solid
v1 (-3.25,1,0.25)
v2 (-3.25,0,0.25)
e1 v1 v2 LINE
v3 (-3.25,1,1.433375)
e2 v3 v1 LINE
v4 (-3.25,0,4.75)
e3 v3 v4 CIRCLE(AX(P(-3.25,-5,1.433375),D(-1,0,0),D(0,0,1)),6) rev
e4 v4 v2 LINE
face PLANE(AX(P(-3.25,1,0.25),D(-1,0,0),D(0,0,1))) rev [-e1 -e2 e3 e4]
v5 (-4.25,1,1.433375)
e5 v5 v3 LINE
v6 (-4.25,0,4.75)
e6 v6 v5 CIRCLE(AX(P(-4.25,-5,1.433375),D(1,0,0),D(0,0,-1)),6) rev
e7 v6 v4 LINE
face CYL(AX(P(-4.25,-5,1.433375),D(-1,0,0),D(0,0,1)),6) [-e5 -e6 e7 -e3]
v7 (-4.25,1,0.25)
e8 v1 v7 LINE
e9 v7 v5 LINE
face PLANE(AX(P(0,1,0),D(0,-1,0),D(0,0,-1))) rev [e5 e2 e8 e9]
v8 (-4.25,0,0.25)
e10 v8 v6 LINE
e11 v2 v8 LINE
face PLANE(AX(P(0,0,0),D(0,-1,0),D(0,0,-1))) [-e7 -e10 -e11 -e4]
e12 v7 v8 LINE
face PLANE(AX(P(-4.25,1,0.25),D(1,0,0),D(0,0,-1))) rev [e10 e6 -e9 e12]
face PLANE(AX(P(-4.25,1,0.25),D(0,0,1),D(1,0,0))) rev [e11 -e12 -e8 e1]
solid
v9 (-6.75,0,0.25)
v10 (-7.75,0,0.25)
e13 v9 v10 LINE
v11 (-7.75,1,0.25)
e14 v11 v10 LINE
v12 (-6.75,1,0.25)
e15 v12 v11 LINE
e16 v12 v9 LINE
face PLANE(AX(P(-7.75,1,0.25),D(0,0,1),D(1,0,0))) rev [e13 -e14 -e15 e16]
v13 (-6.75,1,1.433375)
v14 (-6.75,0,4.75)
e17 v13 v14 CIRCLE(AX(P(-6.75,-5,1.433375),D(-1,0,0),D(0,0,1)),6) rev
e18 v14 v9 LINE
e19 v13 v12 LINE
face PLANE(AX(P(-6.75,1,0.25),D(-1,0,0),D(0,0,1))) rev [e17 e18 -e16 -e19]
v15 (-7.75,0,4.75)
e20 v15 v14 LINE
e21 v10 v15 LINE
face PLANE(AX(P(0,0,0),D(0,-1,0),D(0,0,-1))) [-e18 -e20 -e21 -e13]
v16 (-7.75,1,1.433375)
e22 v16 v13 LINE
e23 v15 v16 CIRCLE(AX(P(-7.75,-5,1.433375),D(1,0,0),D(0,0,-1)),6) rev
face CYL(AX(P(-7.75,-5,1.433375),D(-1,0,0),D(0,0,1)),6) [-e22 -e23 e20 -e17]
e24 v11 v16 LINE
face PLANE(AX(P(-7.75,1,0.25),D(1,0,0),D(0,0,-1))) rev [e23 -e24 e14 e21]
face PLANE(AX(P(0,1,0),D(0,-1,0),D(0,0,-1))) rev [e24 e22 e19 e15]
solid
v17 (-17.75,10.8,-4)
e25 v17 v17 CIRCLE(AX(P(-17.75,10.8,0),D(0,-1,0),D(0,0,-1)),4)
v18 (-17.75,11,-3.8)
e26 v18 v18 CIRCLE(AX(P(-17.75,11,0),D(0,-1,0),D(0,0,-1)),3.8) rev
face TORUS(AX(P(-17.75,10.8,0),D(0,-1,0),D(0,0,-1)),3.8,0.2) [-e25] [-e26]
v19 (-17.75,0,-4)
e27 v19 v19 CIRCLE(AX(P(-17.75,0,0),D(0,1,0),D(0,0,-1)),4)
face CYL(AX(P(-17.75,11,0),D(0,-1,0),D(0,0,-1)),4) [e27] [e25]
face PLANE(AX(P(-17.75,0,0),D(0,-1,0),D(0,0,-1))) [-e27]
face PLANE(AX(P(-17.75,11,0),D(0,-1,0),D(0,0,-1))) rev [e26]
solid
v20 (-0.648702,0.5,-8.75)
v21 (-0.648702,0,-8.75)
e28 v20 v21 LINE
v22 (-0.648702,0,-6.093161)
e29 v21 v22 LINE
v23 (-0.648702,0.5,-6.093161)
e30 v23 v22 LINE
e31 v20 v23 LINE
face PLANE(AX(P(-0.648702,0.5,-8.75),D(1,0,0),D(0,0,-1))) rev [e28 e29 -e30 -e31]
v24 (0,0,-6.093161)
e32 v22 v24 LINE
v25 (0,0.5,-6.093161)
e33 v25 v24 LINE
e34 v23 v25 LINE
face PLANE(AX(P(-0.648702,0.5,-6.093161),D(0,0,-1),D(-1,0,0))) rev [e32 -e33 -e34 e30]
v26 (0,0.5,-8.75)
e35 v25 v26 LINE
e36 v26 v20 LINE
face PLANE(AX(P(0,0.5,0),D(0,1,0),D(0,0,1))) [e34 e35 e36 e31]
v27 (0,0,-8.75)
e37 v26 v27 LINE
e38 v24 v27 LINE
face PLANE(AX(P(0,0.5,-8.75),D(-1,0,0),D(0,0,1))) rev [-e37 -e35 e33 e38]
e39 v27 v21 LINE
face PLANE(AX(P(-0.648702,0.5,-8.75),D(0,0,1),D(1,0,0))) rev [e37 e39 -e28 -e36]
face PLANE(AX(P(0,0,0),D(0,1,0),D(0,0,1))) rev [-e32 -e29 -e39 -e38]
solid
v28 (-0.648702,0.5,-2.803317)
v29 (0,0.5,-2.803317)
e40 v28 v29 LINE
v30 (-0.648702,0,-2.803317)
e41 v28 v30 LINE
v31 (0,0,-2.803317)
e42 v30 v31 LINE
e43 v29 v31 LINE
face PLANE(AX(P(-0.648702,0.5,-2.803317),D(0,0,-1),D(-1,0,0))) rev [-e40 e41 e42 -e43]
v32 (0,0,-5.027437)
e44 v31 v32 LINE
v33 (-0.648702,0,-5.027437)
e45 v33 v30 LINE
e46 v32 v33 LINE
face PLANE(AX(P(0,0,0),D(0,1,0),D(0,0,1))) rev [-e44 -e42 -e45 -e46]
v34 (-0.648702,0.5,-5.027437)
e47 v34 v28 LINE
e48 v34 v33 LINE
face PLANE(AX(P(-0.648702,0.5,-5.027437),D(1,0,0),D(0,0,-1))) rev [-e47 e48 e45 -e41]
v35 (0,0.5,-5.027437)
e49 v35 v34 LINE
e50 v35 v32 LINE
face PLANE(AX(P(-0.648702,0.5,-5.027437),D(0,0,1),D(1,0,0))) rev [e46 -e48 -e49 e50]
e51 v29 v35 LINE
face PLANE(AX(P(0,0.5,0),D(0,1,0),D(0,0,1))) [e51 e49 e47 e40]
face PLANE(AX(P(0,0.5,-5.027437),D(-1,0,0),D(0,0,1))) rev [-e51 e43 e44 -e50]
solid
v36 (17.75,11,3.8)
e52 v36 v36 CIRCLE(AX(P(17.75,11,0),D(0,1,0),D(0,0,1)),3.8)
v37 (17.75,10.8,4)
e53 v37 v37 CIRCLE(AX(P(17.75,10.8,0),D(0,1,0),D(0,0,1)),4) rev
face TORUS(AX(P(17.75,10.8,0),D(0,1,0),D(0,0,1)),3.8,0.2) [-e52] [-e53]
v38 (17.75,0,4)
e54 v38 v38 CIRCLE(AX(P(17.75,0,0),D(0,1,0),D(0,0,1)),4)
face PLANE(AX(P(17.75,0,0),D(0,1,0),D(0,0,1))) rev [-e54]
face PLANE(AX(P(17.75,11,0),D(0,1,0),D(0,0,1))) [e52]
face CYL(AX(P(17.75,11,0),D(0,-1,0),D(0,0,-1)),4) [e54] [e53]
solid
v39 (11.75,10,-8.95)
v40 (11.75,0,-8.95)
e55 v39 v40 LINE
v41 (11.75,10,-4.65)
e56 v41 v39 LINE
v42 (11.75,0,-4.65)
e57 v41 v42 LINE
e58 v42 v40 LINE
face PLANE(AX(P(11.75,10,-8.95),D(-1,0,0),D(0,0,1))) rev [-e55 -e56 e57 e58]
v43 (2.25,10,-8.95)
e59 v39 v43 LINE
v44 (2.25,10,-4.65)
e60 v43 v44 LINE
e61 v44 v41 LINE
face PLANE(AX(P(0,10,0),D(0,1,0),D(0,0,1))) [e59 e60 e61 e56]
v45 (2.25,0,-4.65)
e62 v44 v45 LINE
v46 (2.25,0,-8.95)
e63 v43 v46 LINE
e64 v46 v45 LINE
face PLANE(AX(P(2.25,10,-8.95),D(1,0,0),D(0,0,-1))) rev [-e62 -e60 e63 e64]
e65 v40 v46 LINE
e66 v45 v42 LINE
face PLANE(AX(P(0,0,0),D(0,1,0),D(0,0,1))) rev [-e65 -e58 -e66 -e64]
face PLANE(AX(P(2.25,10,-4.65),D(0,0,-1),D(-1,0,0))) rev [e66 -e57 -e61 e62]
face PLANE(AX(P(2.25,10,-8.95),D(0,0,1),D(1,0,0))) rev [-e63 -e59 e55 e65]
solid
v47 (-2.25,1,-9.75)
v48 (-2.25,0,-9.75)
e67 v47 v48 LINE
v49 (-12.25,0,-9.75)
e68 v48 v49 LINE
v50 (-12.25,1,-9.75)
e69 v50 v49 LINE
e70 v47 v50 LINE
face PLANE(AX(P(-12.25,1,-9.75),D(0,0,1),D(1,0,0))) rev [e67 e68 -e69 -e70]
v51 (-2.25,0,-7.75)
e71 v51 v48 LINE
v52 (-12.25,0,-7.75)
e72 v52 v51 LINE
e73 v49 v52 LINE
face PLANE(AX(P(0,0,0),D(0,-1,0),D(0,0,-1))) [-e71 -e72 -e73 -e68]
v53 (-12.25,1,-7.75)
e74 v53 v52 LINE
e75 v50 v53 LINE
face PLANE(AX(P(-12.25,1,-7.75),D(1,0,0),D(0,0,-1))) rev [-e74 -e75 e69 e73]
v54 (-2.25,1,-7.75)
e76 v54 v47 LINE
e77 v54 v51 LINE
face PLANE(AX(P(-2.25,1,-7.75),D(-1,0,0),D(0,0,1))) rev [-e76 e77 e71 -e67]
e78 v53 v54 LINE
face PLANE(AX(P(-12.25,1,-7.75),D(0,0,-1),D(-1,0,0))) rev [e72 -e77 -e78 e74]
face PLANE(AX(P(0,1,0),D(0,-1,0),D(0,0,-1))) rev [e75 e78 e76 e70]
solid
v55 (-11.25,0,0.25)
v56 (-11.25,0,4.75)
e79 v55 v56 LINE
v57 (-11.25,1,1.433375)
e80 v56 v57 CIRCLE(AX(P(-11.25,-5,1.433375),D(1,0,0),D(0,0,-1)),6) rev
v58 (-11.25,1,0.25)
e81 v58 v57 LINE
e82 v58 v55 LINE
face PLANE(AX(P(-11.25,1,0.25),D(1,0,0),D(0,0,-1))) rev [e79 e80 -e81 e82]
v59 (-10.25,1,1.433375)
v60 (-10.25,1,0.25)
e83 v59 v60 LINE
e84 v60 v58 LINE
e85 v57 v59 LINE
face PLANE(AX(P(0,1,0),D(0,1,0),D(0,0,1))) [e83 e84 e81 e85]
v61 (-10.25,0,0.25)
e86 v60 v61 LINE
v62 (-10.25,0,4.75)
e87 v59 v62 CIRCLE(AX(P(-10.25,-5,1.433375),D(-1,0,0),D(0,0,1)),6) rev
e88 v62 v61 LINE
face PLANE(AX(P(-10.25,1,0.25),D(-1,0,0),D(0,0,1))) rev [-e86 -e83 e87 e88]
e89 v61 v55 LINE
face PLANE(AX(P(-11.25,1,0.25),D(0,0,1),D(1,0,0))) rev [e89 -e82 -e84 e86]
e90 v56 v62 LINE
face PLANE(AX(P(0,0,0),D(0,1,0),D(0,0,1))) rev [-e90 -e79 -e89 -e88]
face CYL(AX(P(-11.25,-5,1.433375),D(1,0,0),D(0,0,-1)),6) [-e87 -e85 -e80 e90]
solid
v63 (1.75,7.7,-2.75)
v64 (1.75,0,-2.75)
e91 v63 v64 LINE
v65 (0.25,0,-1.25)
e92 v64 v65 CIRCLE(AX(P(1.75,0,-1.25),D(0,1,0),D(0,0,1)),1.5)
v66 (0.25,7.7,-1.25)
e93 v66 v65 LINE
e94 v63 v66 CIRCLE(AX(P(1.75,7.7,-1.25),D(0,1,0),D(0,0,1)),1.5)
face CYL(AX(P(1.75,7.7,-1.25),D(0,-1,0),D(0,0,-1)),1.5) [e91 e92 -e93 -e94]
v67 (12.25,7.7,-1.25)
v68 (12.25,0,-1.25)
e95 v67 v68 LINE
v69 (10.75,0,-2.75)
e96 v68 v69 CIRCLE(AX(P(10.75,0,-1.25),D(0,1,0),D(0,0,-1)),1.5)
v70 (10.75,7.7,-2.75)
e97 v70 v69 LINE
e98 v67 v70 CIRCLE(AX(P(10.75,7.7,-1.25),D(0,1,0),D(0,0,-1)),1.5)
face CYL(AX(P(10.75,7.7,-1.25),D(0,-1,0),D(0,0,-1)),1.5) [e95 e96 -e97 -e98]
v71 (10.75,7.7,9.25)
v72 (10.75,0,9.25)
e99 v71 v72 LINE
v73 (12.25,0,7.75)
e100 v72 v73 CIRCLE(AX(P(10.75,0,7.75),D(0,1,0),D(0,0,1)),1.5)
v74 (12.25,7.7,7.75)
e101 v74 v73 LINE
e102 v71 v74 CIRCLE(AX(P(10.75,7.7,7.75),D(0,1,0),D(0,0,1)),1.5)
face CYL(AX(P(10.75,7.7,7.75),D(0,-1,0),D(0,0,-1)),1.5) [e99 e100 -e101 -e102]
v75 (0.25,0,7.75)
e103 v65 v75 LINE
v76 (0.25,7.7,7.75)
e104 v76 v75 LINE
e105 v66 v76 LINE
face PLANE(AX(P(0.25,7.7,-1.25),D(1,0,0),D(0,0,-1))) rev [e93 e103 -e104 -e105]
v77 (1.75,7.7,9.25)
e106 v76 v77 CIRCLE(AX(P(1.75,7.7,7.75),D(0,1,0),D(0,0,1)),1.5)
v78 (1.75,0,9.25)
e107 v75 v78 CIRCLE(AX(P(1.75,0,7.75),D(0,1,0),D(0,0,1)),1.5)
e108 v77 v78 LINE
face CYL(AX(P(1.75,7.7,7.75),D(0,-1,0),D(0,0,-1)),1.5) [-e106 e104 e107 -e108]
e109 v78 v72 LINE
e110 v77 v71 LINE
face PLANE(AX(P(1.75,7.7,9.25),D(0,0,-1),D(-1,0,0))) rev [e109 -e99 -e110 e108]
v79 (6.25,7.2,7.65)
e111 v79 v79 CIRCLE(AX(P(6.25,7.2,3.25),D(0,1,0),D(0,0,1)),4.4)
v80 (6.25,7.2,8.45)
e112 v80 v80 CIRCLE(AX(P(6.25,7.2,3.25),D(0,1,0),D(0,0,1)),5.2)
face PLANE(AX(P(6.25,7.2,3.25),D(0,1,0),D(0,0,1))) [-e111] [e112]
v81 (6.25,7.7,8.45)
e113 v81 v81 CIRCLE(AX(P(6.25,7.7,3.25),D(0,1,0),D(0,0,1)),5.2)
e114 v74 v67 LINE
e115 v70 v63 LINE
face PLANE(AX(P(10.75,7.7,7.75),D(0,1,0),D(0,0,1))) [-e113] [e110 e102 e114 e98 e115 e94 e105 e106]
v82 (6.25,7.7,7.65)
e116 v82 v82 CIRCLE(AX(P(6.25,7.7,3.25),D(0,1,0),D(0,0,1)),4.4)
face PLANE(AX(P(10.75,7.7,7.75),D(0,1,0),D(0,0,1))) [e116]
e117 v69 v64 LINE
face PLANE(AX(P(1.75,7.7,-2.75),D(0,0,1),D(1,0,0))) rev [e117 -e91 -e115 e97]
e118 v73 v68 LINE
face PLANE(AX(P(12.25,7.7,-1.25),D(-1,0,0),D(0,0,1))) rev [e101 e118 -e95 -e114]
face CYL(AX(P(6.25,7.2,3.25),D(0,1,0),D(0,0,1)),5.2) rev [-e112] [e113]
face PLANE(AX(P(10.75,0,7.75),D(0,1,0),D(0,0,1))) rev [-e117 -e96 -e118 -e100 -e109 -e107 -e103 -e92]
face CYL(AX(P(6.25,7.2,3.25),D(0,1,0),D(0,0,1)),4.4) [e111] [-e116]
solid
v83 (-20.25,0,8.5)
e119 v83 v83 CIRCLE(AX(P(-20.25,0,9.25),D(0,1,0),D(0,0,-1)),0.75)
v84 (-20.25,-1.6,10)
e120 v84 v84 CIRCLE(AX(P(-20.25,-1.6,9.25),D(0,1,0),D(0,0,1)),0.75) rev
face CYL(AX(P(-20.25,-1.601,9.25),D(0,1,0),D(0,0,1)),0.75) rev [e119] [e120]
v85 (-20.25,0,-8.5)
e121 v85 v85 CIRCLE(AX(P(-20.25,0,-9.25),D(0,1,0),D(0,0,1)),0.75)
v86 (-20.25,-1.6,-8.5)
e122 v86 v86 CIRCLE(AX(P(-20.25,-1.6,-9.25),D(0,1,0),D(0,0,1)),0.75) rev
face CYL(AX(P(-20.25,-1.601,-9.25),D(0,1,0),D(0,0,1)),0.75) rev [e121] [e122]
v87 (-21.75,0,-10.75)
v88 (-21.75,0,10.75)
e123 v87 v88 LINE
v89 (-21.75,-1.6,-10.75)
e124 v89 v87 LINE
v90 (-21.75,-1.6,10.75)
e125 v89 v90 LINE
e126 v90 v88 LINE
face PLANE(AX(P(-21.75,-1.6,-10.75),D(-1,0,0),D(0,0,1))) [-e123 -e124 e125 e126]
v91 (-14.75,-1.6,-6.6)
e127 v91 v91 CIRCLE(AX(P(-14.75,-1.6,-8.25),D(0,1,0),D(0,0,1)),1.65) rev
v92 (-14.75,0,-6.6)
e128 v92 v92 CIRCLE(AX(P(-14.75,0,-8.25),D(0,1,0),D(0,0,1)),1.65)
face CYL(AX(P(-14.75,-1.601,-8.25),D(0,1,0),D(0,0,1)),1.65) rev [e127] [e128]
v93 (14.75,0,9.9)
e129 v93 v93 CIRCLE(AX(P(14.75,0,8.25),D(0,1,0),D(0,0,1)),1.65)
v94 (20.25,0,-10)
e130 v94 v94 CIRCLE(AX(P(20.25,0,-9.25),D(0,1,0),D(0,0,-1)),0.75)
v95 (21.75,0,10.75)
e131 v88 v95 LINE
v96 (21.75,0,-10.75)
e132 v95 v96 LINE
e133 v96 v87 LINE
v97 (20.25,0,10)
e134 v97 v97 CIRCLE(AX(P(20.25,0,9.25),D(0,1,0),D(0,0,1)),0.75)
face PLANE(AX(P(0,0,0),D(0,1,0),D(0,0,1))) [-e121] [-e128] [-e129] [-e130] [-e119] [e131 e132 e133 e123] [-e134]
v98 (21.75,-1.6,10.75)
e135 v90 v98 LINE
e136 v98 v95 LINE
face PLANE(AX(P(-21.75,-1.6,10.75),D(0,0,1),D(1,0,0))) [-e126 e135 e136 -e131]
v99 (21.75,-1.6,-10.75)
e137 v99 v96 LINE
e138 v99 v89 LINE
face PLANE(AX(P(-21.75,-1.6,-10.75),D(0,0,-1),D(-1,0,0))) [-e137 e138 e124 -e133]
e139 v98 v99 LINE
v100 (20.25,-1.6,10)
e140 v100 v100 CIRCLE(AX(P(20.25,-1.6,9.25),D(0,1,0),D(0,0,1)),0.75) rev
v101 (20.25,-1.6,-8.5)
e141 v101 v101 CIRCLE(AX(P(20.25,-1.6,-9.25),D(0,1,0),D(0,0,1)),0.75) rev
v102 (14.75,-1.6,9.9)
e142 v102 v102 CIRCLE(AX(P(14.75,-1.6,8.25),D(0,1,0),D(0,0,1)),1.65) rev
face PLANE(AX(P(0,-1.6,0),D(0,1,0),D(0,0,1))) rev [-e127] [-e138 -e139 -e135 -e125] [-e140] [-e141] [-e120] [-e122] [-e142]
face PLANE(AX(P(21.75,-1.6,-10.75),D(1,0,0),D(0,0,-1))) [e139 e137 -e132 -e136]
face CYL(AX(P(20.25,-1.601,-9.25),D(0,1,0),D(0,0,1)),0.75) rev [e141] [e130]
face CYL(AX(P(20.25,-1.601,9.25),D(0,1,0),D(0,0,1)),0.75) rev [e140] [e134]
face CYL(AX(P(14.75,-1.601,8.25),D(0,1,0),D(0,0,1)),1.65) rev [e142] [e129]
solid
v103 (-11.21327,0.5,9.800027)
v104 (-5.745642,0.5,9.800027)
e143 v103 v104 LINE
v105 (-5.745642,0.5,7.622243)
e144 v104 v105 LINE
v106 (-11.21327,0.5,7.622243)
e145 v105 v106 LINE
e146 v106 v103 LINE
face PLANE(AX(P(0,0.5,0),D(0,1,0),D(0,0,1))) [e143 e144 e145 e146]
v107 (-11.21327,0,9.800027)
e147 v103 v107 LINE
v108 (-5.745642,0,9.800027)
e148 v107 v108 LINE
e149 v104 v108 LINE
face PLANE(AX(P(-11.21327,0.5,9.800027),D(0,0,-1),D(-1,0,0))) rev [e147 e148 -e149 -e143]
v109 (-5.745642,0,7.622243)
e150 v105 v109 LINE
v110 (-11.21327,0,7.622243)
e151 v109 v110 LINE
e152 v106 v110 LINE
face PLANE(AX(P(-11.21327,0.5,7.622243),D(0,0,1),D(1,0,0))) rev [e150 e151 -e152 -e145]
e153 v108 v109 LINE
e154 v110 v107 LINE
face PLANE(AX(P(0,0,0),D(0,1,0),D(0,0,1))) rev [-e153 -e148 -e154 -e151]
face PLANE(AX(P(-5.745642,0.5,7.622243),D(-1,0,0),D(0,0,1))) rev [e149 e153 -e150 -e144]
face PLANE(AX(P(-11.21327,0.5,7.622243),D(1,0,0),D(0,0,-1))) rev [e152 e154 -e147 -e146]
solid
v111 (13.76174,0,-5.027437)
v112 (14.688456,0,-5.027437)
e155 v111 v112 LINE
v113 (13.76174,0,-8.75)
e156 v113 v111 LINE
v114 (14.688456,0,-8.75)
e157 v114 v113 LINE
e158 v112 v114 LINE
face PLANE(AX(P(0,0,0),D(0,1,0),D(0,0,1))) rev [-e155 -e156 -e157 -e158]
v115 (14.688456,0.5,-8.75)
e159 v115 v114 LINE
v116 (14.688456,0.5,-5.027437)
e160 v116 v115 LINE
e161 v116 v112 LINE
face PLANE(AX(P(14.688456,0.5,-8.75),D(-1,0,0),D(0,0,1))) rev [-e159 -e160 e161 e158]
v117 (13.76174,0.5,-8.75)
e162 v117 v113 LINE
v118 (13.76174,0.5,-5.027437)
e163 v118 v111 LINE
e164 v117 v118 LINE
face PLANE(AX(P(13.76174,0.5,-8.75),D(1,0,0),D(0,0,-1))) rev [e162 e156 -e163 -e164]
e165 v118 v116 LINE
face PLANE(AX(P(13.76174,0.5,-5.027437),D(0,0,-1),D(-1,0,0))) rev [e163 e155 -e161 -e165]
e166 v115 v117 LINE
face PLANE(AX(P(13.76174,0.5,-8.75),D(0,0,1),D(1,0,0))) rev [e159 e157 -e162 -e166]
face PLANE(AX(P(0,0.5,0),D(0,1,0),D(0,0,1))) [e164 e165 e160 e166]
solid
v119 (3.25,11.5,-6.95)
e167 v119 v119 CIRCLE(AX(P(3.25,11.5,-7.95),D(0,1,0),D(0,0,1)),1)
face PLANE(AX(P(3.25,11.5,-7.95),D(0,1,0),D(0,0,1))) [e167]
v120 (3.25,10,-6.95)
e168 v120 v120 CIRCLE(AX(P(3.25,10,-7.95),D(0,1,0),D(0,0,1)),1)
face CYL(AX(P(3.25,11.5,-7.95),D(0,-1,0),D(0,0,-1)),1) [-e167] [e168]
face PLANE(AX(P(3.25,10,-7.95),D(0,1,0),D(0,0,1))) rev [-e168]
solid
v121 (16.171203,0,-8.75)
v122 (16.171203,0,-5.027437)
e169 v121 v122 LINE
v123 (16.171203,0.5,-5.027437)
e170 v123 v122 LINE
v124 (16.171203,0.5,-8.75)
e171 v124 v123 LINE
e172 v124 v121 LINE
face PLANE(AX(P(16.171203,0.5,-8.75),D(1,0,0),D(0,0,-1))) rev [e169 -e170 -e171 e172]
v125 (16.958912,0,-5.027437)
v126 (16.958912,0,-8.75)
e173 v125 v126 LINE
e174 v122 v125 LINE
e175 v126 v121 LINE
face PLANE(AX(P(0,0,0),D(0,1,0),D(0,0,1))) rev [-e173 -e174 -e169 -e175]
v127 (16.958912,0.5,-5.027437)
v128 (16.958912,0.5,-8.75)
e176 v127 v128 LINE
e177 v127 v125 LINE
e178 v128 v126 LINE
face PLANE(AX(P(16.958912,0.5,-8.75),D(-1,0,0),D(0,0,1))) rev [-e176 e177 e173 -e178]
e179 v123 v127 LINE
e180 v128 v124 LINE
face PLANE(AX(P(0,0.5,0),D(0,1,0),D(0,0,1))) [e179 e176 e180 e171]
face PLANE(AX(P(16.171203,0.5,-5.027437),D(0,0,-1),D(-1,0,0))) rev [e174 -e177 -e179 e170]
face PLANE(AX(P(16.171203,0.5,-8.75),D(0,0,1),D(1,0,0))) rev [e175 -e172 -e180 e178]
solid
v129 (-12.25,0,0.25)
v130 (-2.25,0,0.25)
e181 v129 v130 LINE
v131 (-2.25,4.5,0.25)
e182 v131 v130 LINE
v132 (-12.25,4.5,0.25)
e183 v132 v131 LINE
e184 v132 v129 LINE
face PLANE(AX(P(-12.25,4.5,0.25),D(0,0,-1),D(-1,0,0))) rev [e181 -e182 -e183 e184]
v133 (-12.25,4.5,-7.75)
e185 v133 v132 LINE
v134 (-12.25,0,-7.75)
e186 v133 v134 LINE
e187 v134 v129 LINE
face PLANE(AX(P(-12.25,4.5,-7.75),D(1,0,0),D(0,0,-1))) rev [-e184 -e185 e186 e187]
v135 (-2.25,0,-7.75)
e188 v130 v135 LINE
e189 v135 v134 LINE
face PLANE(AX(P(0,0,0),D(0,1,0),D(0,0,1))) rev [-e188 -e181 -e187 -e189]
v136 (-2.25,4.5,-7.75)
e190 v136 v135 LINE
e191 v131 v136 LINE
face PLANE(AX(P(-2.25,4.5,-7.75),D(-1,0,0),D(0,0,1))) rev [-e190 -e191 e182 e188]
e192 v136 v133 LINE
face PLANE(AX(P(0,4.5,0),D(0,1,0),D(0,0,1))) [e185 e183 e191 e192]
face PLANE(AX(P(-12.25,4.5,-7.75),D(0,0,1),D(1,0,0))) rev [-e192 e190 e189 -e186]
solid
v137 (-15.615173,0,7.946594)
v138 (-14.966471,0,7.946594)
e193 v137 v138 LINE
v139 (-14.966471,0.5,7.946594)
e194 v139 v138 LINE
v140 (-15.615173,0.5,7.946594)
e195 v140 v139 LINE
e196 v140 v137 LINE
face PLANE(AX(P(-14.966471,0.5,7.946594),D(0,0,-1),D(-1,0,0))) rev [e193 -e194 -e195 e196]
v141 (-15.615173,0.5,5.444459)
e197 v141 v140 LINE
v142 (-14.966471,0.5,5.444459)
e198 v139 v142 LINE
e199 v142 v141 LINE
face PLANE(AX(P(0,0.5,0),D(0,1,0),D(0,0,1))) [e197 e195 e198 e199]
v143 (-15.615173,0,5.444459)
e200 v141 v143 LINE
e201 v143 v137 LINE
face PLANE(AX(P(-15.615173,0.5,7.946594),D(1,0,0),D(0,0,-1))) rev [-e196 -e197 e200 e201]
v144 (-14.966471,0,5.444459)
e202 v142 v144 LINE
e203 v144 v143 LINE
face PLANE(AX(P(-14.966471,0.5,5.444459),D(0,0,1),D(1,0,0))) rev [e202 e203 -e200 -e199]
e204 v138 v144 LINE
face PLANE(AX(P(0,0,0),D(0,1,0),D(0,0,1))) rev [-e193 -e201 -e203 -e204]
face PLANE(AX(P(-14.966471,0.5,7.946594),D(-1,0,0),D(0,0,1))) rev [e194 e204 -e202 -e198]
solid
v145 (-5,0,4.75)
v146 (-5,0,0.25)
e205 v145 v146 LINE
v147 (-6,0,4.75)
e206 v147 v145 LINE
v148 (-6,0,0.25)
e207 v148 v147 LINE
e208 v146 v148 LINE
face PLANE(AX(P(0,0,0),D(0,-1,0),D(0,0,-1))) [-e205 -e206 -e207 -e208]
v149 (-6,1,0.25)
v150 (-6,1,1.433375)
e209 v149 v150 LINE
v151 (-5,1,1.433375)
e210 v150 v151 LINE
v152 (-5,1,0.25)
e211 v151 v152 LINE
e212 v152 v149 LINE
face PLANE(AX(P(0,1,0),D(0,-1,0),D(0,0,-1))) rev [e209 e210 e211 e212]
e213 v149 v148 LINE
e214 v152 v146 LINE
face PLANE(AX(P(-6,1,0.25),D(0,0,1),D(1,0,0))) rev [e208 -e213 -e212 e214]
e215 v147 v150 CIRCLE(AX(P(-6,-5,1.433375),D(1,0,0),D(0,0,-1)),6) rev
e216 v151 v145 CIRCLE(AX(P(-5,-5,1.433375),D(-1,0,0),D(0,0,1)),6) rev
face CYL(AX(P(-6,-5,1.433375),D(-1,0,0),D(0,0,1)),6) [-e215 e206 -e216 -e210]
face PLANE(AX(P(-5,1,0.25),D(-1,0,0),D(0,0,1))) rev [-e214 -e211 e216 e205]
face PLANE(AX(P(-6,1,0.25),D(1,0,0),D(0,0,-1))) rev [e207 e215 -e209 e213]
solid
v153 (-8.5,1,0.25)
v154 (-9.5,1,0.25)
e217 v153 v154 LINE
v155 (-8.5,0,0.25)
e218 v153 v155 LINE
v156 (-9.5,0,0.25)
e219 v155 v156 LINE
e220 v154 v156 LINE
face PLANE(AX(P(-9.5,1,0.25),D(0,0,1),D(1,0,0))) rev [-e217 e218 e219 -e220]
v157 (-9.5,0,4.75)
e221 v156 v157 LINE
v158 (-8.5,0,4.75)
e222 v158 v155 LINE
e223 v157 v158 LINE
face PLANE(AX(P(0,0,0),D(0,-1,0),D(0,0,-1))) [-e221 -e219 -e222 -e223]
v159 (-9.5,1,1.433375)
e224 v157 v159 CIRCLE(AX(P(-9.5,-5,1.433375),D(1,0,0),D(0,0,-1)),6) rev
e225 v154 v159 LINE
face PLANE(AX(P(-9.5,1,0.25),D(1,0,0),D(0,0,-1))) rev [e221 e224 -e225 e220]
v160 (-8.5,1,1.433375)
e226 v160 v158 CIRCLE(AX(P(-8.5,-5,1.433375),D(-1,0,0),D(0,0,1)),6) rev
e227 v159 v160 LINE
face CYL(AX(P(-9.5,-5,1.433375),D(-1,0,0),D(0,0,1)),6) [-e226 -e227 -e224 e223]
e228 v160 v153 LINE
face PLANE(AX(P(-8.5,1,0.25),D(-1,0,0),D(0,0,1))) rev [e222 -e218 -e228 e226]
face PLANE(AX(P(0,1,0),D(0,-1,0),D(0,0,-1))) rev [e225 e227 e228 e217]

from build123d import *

# Parameters (mm, degrees)
CROQUIS1_W                = 43.5
CROQUIS1_H                = 21.5
SALIENTE_EXTRUIR1_DEPTH   = 1.6
CORTAR_EXTRUIR1_REACH     = 26.314
CROQUIS2_R                = 1.65
CROQUIS2_R_2              = 0.75
CROQUIS3_R                = 4
SALIENTE_EXTRUIR2_DEPTH   = 11
SALIENTE_EXTRUIR2_2_DEPTH = 11
REDONDEO1_R               = 0.2
REDONDEO2_R               = 0.2
SALIENTE_EXTRUIR3_DEPTH   = 7.7
CROQUIS5_R                = 5.2
CROQUIS5_R_2              = 4.4
CORTAR_EXTRUIR2_DEPTH     = 0.5
CROQUIS6_W                = 9.5
CROQUIS6_H                = 4.3
SALIENTE_EXTRUIR4_DEPTH   = 10
CROQUIS7_R                = 1
SALIENTE_EXTRUIR5_DEPTH   = 1.5
CROQUIS8_W                = 10
CROQUIS8_H                = 8
SALIENTE_EXTRUIR6_DEPTH   = 4.5
CROQUIS9_W                = 1
CROQUIS9_H                = 4.5
SALIENTE_EXTRUIR7_DEPTH   = 1
SALIENTE_EXTRUIR7_2_DEPTH = 1
SALIENTE_EXTRUIR7_3_DEPTH = 1
SALIENTE_EXTRUIR7_4_DEPTH = 1
SALIENTE_EXTRUIR7_5_DEPTH = 1
REDONDEO4_R               = 6
REDONDEO5_R               = 6
REDONDEO6_R               = 6
REDONDEO7_R               = 6
REDONDEO8_R               = 6
CROQUIS10_W               = 10
CROQUIS10_H               = 2
SALIENTE_EXTRUIR8_DEPTH   = 1
CROQUIS11_W               = 5.467627337
CROQUIS11_H               = 2.17778377
SALIENTE_EXTRUIR9_DEPTH   = 0.5
CROQUIS11_W_2             = 0.648701548
CROQUIS11_H_2             = 2.502134543
SALIENTE_EXTRUIR9_2_DEPTH = 0.5
CROQUIS11_H_3             = 2.656839028
SALIENTE_EXTRUIR9_3_DEPTH = 0.5
CROQUIS11_H_4             = 2.224119595
SALIENTE_EXTRUIR9_4_DEPTH = 0.5
CROQUIS11_W_3             = 0.926716498
CROQUIS11_H_5             = 3.722563
SALIENTE_EXTRUIR9_5_DEPTH = 0.5
CROQUIS11_W_4             = 0.787709023
SALIENTE_EXTRUIR9_6_DEPTH = 0.5


with BuildPart() as part:
    # Croquis1 → Saliente-Extruir1 (new body)
    with BuildSketch(Plane(origin=(0, 0, 0), x_dir=(1, 0, 0), z_dir=(0, 1, 0))):
        Rectangle(CROQUIS1_W, CROQUIS1_H)
    extrude(amount=-SALIENTE_EXTRUIR1_DEPTH)

    # Croquis2 → Cortar-Extruir1 (cut, up to next)
    with BuildSketch(Plane(origin=(0, 0, 0), x_dir=(1, 0, 0), z_dir=(0, 1, 0)), mode=Mode.PRIVATE) as cortar_extruir1_sk1:
        with Locations(Location((14.75, -8.25, 0), (0, 0, 270))):
            Circle(CROQUIS2_R)
    cortar_extruir1_tool1 = extrude(cortar_extruir1_sk1.sketch, amount=-CORTAR_EXTRUIR1_REACH, mode=Mode.PRIVATE) & part.part
    # Croquis2 → Cortar-Extruir1 (cut, up to next)
    with BuildSketch(Plane(origin=(0, 0, 0), x_dir=(1, 0, 0), z_dir=(0, 1, 0)), mode=Mode.PRIVATE) as cortar_extruir1_sk2:
        with Locations(Location((-14.75, 8.25, 0), (0, 0, 270))):
            Circle(CROQUIS2_R)
    cortar_extruir1_tool2 = extrude(cortar_extruir1_sk2.sketch, amount=-CORTAR_EXTRUIR1_REACH, mode=Mode.PRIVATE) & part.part
    # Croquis2 → Cortar-Extruir1 (cut, up to next)
    with BuildSketch(Plane(origin=(0, 0, 0), x_dir=(1, 0, 0), z_dir=(0, 1, 0)), mode=Mode.PRIVATE) as cortar_extruir1_sk3:
        with Locations(Location((20.25, -9.25, 0), (0, 0, 270))):
            Circle(CROQUIS2_R_2)
    cortar_extruir1_tool3 = extrude(cortar_extruir1_sk3.sketch, amount=-CORTAR_EXTRUIR1_REACH, mode=Mode.PRIVATE) & part.part
    # Croquis2 → Cortar-Extruir1 (cut, up to next)
    with BuildSketch(Plane(origin=(0, 0, 0), x_dir=(1, 0, 0), z_dir=(0, 1, 0)), mode=Mode.PRIVATE) as cortar_extruir1_sk4:
        with Locations(Location((-20.25, -9.25, 0), (0, 0, 270))):
            Circle(CROQUIS2_R_2)
    cortar_extruir1_tool4 = extrude(cortar_extruir1_sk4.sketch, amount=-CORTAR_EXTRUIR1_REACH, mode=Mode.PRIVATE) & part.part
    # Croquis2 → Cortar-Extruir1 (cut, up to next)
    with BuildSketch(Plane(origin=(0, 0, 0), x_dir=(1, 0, 0), z_dir=(0, 1, 0)), mode=Mode.PRIVATE) as cortar_extruir1_sk5:
        with Locations(Location((20.25, 9.25, 0), (0, 0, 270))):
            Circle(CROQUIS2_R_2)
    cortar_extruir1_tool5 = extrude(cortar_extruir1_sk5.sketch, amount=-CORTAR_EXTRUIR1_REACH, mode=Mode.PRIVATE) & part.part
    # Croquis2 → Cortar-Extruir1 (cut, up to next)
    with BuildSketch(Plane(origin=(0, 0, 0), x_dir=(1, 0, 0), z_dir=(0, 1, 0)), mode=Mode.PRIVATE) as cortar_extruir1_sk6:
        with Locations(Location((-20.25, 9.25, 0), (0, 0, 270))):
            Circle(CROQUIS2_R_2)
    cortar_extruir1_tool6 = extrude(cortar_extruir1_sk6.sketch, amount=-CORTAR_EXTRUIR1_REACH, mode=Mode.PRIVATE) & part.part
    add(cortar_extruir1_tool1.solids().sort_by_distance((14.75, 0, 8.25))[0], mode=Mode.SUBTRACT)
    add(cortar_extruir1_tool2.solids().sort_by_distance((-14.75, 0, -8.25))[0], mode=Mode.SUBTRACT)
    add(cortar_extruir1_tool3.solids().sort_by_distance((20.25, 0, 9.25))[0], mode=Mode.SUBTRACT)
    add(cortar_extruir1_tool4.solids().sort_by_distance((-20.25, 0, 9.25))[0], mode=Mode.SUBTRACT)
    add(cortar_extruir1_tool5.solids().sort_by_distance((20.25, 0, -9.25))[0], mode=Mode.SUBTRACT)
    add(cortar_extruir1_tool6.solids().sort_by_distance((-20.25, 0, -9.25))[0], mode=Mode.SUBTRACT)


with BuildPart() as body_2:
    # Croquis3 → Saliente-Extruir2 (new body)
    with BuildSketch(Plane(origin=(0, 0, 0), x_dir=(1, 0, 0), z_dir=(0, 1, 0))):
        with Locations(Location((17.75, 0, 0), (0, 0, 270))):
            Circle(CROQUIS3_R)
    extrude(amount=SALIENTE_EXTRUIR2_DEPTH)

    # Redondeo2
    redondeo2_edges = [body_2.edges().sort_by_distance(p)[0] for p in [
        (17.75, 11, -4),
    ]]
    fillet(redondeo2_edges, radius=REDONDEO2_R)


with BuildPart() as body_3:
    # Croquis3 → Saliente-Extruir2 2 (new body)
    with BuildSketch(Plane(origin=(0, 0, 0), x_dir=(1, 0, 0), z_dir=(0, 1, 0))):
        with Locations(Location((-17.75, 0, 0), (0, 0, 90))):
            Circle(CROQUIS3_R)
    extrude(amount=SALIENTE_EXTRUIR2_2_DEPTH)

    # Redondeo1
    redondeo1_edges = [body_3.edges().sort_by_distance(p)[0] for p in [
        (-17.75, 11, 4),
    ]]
    fillet(redondeo1_edges, radius=REDONDEO1_R)


with BuildPart() as body_4:
    # Croquis4 → Saliente-Extruir3 (new body)
    with BuildSketch(Plane(origin=(0, 0, 0), x_dir=(1, 0, 0), z_dir=(0, 1, 0))):
        with BuildLine():
            Line((1.75, 2.75), (10.75, 2.75))
            ThreePointArc((10.75, 2.75), (11.810660172, 2.310660172), (12.25, 1.25))
            Line((12.25, 1.25), (12.25, -7.75))
            ThreePointArc((12.25, -7.75), (11.810660172, -8.810660172), (10.75, -9.25))
            Line((10.75, -9.25), (1.75, -9.25))
            ThreePointArc((1.75, -9.25), (0.689339828, -8.810660172), (0.25, -7.75))
            Line((0.25, -7.75), (0.25, 1.25))
            ThreePointArc((0.25, 1.25), (0.689339828, 2.310660172), (1.75, 2.75))
        make_face()
    extrude(amount=SALIENTE_EXTRUIR3_DEPTH)

    # Croquis5 → Cortar-Extruir2 (cut)
    with BuildSketch(Plane(origin=(0, 7.7, 0), x_dir=(1, 0, 0), z_dir=(0, 1, 0))):
        with Locations(Location((6.25, -3.25, 0), (0, 0, 270))):
            Circle(CROQUIS5_R)
        with Locations(Location((6.25, -3.25, 0), (0, 0, 270))):
            Circle(CROQUIS5_R_2, mode=Mode.SUBTRACT)
    extrude(amount=-CORTAR_EXTRUIR2_DEPTH, mode=Mode.SUBTRACT)


with BuildPart() as body_5:
    # Croquis6 → Saliente-Extruir4 (new body)
    with BuildSketch(Plane(origin=(0, 0, 0), x_dir=(1, 0, 0), z_dir=(0, 1, 0))):
        with Locations((7, 6.8)):
            Rectangle(CROQUIS6_W, CROQUIS6_H)
    extrude(amount=SALIENTE_EXTRUIR4_DEPTH)


with BuildPart() as body_6:
    # Croquis7 → Saliente-Extruir5 (new body)
    with BuildSketch(Plane(origin=(0, 10, 0), x_dir=(1, 0, 0), z_dir=(0, 1, 0))):
        with Locations(Location((3.25, 7.95, 0), (0, 0, 270))):
            Circle(CROQUIS7_R)
    extrude(amount=SALIENTE_EXTRUIR5_DEPTH)


with BuildPart() as body_7:
    # Croquis8 → Saliente-Extruir6 (new body)
    with BuildSketch(Plane(origin=(0, 0, 0), x_dir=(1, 0, 0), z_dir=(0, 1, 0))):
        with Locations((-7.25, 3.75)):
            Rectangle(CROQUIS8_W, CROQUIS8_H)
    extrude(amount=SALIENTE_EXTRUIR6_DEPTH)


with BuildPart() as body_8:
    # Croquis9 → Saliente-Extruir7 (new body)
    with BuildSketch(Plane(origin=(0, 0, 0), x_dir=(1, 0, 0), z_dir=(0, 1, 0))):
        with Locations((-10.75, -2.5)):
            Rectangle(CROQUIS9_W, CROQUIS9_H)
    extrude(amount=SALIENTE_EXTRUIR7_DEPTH)

    # Redondeo4
    # the kernel refuses this fillet: 6 mm, written as the material it takes off along each edge
    with BuildSketch(Plane(origin=(-1.958438024, 1, 4.75), x_dir=(0, -1.0, -3.316458219143687e-12), z_dir=(-1, 0, 0))) as redondeo4_piece_1:
        with BuildLine():
            CenterArc((6, -3.31662479), REDONDEO4_R, 146.442690238, 33.557309762)
            Line((0, -3.31662479), (-0.12, -3.31662479))
            Line((-0.12, -3.31662479), (-0.12, 0))
            Line((-0.12, 0), (0, 0.12))
            ThreePointArc((0, 0.12), (0.5, 0.12), (0.9, 0.066332496))
            Line((0.9, 0.066332496), (1, 0))
        make_face()
    extrude(amount=17.583123952, mode=Mode.SUBTRACT)


with BuildPart() as body_9:
    # Croquis9 → Saliente-Extruir7 2 (new body)
    with BuildSketch(Plane(origin=(0, 0, 0), x_dir=(1, 0, 0), z_dir=(0, 1, 0))):
        with Locations((-9, -2.5)):
            Rectangle(CROQUIS9_W, CROQUIS9_H)
    extrude(amount=SALIENTE_EXTRUIR7_2_DEPTH)

    # Redondeo5
    # the kernel refuses this fillet: 6 mm, written as the material it takes off along each edge
    with BuildSketch(Plane(origin=(-17.791561976, 1, 4.75), x_dir=(0, -1.0, -3.328892717019364e-12), z_dir=(1, 0, 0))) as redondeo5_piece_1:
        with BuildLine():
            CenterArc((6, 3.31662479), REDONDEO5_R, 180, 33.557309762)
            Line((0, 3.31662479), (-0.12, 3.31662479))
            Line((-0.12, 3.31662479), (-0.12, 0))
            Line((-0.12, 0), (0, -0.12))
            ThreePointArc((0, -0.12), (0.5, -0.12), (0.9, -0.066332496))
            Line((0.9, -0.066332496), (1, 0))
        make_face()
    extrude(amount=17.583123952, mode=Mode.SUBTRACT)


with BuildPart() as body_10:
    # Croquis9 → Saliente-Extruir7 3 (new body)
    with BuildSketch(Plane(origin=(0, 0, 0), x_dir=(1, 0, 0), z_dir=(0, 1, 0))):
        with Locations((-7.25, -2.5)):
            Rectangle(CROQUIS9_W, CROQUIS9_H)
    extrude(amount=SALIENTE_EXTRUIR7_3_DEPTH)

    # Redondeo6
    # the kernel refuses this fillet: 6 mm, written as the material it takes off along each edge
    with BuildSketch(Plane(origin=(-16.041561976, 1, 4.75), x_dir=(0, -1.0, -3.328892717019364e-12), z_dir=(1, 0, 0))) as redondeo6_piece_1:
        with BuildLine():
            CenterArc((6, 3.31662479), REDONDEO6_R, 180, 33.557309762)
            Line((0, 3.31662479), (-0.12, 3.31662479))
            Line((-0.12, 3.31662479), (-0.12, 0))
            Line((-0.12, 0), (0, -0.12))
            ThreePointArc((0, -0.12), (0.5, -0.12), (0.9, -0.066332496))
            Line((0.9, -0.066332496), (1, 0))
        make_face()
    extrude(amount=17.583123952, mode=Mode.SUBTRACT)


with BuildPart() as body_11:
    # Croquis9 → Saliente-Extruir7 4 (new body)
    with BuildSketch(Plane(origin=(0, 0, 0), x_dir=(1, 0, 0), z_dir=(0, 1, 0))):
        with Locations((-5.5, -2.5)):
            Rectangle(CROQUIS9_W, CROQUIS9_H)
    extrude(amount=SALIENTE_EXTRUIR7_4_DEPTH)

    # Redondeo7
    # the kernel refuses this fillet: 6 mm, written as the material it takes off along each edge
    with BuildSketch(Plane(origin=(-14.291561976, 1, 4.75), x_dir=(0, -1.0, -3.316458219143687e-12), z_dir=(1, 0, 0))) as redondeo7_piece_1:
        with BuildLine():
            CenterArc((6, 3.31662479), REDONDEO7_R, 180, 33.557309762)
            Line((0, 3.31662479), (-0.12, 3.31662479))
            Line((-0.12, 3.31662479), (-0.12, 0))
            Line((-0.12, 0), (0, -0.12))
            ThreePointArc((0, -0.12), (0.5, -0.12), (0.9, -0.066332496))
            Line((0.9, -0.066332496), (1, 0))
        make_face()
    extrude(amount=17.583123952, mode=Mode.SUBTRACT)


with BuildPart() as body_12:
    # Croquis9 → Saliente-Extruir7 5 (new body)
    with BuildSketch(Plane(origin=(0, 0, 0), x_dir=(1, 0, 0), z_dir=(0, 1, 0))):
        with Locations((-3.75, -2.5)):
            Rectangle(CROQUIS9_W, CROQUIS9_H)
    extrude(amount=SALIENTE_EXTRUIR7_5_DEPTH)

    # Redondeo8
    # the kernel refuses this fillet: 6 mm, written as the material it takes off along each edge
    with BuildSketch(Plane(origin=(-12.541561976, 1, 4.75), x_dir=(0, -1.0, -3.316458219143687e-12), z_dir=(1, 0, 0))) as redondeo8_piece_1:
        with BuildLine():
            CenterArc((6, 3.31662479), REDONDEO8_R, 180, 33.557309762)
            Line((0, 3.31662479), (-0.12, 3.31662479))
            Line((-0.12, 3.31662479), (-0.12, 0))
            Line((-0.12, 0), (0, -0.12))
            ThreePointArc((0, -0.12), (0.5, -0.12), (0.9, -0.066332496))
            Line((0.9, -0.066332496), (1, 0))
        make_face()
    extrude(amount=17.583123952, mode=Mode.SUBTRACT)


with BuildPart() as body_13:
    # Croquis10 → Saliente-Extruir8 (new body)
    with BuildSketch(Plane(origin=(0, 0, 0), x_dir=(1, 0, 0), z_dir=(0, 1, 0))):
        with Locations((-7.25, 8.75)):
            Rectangle(CROQUIS10_W, CROQUIS10_H)
    extrude(amount=SALIENTE_EXTRUIR8_DEPTH)


with BuildPart() as body_14:
    # Croquis11 → Saliente-Extruir9 (new body)
    with BuildSketch(Plane(origin=(0, 0, 0), x_dir=(1, 0, 0), z_dir=(0, 1, 0))):
        with Locations((-8.479455954, -8.711135078)):
            Rectangle(CROQUIS11_W, CROQUIS11_H)
    extrude(amount=SALIENTE_EXTRUIR9_DEPTH)


with BuildPart() as body_15:
    # Croquis11 → Saliente-Extruir9 2 (new body)
    with BuildSketch(Plane(origin=(0, 0, 0), x_dir=(1, 0, 0), z_dir=(0, 1, 0))):
        with Locations((-15.290822211, -6.695526695)):
            Rectangle(CROQUIS11_W_2, CROQUIS11_H_2)
    extrude(amount=SALIENTE_EXTRUIR9_2_DEPTH)


with BuildPart() as body_16:
    # Croquis11 → Saliente-Extruir9 3 (new body)
    with BuildSketch(Plane(origin=(0, 0, 0), x_dir=(1, 0, 0), z_dir=(0, 1, 0))):
        with Locations((-0.324350774, 7.421580486)):
            Rectangle(CROQUIS11_W_2, CROQUIS11_H_3)
    extrude(amount=SALIENTE_EXTRUIR9_3_DEPTH)


with BuildPart() as body_17:
    # Croquis11 → Saliente-Extruir9 4 (new body)
    with BuildSketch(Plane(origin=(0, 0, 0), x_dir=(1, 0, 0), z_dir=(0, 1, 0))):
        with Locations((-0.324350774, 3.915377203)):
            Rectangle(CROQUIS11_W_2, CROQUIS11_H_4)
    extrude(amount=SALIENTE_EXTRUIR9_4_DEPTH)


with BuildPart() as body_18:
    # Croquis11 → Saliente-Extruir9 5 (new body)
    with BuildSketch(Plane(origin=(0, 0, 0), x_dir=(1, 0, 0), z_dir=(0, 1, 0))):
        with Locations((14.225098239, 6.8887185)):
            Rectangle(CROQUIS11_W_3, CROQUIS11_H_5)
    extrude(amount=SALIENTE_EXTRUIR9_5_DEPTH)


with BuildPart() as body_19:
    # Croquis11 → Saliente-Extruir9 6 (new body)
    with BuildSketch(Plane(origin=(0, 0, 0), x_dir=(1, 0, 0), z_dir=(0, 1, 0))):
        with Locations((16.565057395, 6.8887185)):
            Rectangle(CROQUIS11_W_4, CROQUIS11_H_5)
    extrude(amount=SALIENTE_EXTRUIR9_6_DEPTH)


solid = Compound([part.part, body_2.part, body_3.part, body_4.part, body_5.part, body_6.part, body_7.part, body_8.part, body_9.part, body_10.part, body_11.part, body_12.part, body_13.part, body_14.part, body_15.part, body_16.part, body_17.part, body_18.part, body_19.part])
